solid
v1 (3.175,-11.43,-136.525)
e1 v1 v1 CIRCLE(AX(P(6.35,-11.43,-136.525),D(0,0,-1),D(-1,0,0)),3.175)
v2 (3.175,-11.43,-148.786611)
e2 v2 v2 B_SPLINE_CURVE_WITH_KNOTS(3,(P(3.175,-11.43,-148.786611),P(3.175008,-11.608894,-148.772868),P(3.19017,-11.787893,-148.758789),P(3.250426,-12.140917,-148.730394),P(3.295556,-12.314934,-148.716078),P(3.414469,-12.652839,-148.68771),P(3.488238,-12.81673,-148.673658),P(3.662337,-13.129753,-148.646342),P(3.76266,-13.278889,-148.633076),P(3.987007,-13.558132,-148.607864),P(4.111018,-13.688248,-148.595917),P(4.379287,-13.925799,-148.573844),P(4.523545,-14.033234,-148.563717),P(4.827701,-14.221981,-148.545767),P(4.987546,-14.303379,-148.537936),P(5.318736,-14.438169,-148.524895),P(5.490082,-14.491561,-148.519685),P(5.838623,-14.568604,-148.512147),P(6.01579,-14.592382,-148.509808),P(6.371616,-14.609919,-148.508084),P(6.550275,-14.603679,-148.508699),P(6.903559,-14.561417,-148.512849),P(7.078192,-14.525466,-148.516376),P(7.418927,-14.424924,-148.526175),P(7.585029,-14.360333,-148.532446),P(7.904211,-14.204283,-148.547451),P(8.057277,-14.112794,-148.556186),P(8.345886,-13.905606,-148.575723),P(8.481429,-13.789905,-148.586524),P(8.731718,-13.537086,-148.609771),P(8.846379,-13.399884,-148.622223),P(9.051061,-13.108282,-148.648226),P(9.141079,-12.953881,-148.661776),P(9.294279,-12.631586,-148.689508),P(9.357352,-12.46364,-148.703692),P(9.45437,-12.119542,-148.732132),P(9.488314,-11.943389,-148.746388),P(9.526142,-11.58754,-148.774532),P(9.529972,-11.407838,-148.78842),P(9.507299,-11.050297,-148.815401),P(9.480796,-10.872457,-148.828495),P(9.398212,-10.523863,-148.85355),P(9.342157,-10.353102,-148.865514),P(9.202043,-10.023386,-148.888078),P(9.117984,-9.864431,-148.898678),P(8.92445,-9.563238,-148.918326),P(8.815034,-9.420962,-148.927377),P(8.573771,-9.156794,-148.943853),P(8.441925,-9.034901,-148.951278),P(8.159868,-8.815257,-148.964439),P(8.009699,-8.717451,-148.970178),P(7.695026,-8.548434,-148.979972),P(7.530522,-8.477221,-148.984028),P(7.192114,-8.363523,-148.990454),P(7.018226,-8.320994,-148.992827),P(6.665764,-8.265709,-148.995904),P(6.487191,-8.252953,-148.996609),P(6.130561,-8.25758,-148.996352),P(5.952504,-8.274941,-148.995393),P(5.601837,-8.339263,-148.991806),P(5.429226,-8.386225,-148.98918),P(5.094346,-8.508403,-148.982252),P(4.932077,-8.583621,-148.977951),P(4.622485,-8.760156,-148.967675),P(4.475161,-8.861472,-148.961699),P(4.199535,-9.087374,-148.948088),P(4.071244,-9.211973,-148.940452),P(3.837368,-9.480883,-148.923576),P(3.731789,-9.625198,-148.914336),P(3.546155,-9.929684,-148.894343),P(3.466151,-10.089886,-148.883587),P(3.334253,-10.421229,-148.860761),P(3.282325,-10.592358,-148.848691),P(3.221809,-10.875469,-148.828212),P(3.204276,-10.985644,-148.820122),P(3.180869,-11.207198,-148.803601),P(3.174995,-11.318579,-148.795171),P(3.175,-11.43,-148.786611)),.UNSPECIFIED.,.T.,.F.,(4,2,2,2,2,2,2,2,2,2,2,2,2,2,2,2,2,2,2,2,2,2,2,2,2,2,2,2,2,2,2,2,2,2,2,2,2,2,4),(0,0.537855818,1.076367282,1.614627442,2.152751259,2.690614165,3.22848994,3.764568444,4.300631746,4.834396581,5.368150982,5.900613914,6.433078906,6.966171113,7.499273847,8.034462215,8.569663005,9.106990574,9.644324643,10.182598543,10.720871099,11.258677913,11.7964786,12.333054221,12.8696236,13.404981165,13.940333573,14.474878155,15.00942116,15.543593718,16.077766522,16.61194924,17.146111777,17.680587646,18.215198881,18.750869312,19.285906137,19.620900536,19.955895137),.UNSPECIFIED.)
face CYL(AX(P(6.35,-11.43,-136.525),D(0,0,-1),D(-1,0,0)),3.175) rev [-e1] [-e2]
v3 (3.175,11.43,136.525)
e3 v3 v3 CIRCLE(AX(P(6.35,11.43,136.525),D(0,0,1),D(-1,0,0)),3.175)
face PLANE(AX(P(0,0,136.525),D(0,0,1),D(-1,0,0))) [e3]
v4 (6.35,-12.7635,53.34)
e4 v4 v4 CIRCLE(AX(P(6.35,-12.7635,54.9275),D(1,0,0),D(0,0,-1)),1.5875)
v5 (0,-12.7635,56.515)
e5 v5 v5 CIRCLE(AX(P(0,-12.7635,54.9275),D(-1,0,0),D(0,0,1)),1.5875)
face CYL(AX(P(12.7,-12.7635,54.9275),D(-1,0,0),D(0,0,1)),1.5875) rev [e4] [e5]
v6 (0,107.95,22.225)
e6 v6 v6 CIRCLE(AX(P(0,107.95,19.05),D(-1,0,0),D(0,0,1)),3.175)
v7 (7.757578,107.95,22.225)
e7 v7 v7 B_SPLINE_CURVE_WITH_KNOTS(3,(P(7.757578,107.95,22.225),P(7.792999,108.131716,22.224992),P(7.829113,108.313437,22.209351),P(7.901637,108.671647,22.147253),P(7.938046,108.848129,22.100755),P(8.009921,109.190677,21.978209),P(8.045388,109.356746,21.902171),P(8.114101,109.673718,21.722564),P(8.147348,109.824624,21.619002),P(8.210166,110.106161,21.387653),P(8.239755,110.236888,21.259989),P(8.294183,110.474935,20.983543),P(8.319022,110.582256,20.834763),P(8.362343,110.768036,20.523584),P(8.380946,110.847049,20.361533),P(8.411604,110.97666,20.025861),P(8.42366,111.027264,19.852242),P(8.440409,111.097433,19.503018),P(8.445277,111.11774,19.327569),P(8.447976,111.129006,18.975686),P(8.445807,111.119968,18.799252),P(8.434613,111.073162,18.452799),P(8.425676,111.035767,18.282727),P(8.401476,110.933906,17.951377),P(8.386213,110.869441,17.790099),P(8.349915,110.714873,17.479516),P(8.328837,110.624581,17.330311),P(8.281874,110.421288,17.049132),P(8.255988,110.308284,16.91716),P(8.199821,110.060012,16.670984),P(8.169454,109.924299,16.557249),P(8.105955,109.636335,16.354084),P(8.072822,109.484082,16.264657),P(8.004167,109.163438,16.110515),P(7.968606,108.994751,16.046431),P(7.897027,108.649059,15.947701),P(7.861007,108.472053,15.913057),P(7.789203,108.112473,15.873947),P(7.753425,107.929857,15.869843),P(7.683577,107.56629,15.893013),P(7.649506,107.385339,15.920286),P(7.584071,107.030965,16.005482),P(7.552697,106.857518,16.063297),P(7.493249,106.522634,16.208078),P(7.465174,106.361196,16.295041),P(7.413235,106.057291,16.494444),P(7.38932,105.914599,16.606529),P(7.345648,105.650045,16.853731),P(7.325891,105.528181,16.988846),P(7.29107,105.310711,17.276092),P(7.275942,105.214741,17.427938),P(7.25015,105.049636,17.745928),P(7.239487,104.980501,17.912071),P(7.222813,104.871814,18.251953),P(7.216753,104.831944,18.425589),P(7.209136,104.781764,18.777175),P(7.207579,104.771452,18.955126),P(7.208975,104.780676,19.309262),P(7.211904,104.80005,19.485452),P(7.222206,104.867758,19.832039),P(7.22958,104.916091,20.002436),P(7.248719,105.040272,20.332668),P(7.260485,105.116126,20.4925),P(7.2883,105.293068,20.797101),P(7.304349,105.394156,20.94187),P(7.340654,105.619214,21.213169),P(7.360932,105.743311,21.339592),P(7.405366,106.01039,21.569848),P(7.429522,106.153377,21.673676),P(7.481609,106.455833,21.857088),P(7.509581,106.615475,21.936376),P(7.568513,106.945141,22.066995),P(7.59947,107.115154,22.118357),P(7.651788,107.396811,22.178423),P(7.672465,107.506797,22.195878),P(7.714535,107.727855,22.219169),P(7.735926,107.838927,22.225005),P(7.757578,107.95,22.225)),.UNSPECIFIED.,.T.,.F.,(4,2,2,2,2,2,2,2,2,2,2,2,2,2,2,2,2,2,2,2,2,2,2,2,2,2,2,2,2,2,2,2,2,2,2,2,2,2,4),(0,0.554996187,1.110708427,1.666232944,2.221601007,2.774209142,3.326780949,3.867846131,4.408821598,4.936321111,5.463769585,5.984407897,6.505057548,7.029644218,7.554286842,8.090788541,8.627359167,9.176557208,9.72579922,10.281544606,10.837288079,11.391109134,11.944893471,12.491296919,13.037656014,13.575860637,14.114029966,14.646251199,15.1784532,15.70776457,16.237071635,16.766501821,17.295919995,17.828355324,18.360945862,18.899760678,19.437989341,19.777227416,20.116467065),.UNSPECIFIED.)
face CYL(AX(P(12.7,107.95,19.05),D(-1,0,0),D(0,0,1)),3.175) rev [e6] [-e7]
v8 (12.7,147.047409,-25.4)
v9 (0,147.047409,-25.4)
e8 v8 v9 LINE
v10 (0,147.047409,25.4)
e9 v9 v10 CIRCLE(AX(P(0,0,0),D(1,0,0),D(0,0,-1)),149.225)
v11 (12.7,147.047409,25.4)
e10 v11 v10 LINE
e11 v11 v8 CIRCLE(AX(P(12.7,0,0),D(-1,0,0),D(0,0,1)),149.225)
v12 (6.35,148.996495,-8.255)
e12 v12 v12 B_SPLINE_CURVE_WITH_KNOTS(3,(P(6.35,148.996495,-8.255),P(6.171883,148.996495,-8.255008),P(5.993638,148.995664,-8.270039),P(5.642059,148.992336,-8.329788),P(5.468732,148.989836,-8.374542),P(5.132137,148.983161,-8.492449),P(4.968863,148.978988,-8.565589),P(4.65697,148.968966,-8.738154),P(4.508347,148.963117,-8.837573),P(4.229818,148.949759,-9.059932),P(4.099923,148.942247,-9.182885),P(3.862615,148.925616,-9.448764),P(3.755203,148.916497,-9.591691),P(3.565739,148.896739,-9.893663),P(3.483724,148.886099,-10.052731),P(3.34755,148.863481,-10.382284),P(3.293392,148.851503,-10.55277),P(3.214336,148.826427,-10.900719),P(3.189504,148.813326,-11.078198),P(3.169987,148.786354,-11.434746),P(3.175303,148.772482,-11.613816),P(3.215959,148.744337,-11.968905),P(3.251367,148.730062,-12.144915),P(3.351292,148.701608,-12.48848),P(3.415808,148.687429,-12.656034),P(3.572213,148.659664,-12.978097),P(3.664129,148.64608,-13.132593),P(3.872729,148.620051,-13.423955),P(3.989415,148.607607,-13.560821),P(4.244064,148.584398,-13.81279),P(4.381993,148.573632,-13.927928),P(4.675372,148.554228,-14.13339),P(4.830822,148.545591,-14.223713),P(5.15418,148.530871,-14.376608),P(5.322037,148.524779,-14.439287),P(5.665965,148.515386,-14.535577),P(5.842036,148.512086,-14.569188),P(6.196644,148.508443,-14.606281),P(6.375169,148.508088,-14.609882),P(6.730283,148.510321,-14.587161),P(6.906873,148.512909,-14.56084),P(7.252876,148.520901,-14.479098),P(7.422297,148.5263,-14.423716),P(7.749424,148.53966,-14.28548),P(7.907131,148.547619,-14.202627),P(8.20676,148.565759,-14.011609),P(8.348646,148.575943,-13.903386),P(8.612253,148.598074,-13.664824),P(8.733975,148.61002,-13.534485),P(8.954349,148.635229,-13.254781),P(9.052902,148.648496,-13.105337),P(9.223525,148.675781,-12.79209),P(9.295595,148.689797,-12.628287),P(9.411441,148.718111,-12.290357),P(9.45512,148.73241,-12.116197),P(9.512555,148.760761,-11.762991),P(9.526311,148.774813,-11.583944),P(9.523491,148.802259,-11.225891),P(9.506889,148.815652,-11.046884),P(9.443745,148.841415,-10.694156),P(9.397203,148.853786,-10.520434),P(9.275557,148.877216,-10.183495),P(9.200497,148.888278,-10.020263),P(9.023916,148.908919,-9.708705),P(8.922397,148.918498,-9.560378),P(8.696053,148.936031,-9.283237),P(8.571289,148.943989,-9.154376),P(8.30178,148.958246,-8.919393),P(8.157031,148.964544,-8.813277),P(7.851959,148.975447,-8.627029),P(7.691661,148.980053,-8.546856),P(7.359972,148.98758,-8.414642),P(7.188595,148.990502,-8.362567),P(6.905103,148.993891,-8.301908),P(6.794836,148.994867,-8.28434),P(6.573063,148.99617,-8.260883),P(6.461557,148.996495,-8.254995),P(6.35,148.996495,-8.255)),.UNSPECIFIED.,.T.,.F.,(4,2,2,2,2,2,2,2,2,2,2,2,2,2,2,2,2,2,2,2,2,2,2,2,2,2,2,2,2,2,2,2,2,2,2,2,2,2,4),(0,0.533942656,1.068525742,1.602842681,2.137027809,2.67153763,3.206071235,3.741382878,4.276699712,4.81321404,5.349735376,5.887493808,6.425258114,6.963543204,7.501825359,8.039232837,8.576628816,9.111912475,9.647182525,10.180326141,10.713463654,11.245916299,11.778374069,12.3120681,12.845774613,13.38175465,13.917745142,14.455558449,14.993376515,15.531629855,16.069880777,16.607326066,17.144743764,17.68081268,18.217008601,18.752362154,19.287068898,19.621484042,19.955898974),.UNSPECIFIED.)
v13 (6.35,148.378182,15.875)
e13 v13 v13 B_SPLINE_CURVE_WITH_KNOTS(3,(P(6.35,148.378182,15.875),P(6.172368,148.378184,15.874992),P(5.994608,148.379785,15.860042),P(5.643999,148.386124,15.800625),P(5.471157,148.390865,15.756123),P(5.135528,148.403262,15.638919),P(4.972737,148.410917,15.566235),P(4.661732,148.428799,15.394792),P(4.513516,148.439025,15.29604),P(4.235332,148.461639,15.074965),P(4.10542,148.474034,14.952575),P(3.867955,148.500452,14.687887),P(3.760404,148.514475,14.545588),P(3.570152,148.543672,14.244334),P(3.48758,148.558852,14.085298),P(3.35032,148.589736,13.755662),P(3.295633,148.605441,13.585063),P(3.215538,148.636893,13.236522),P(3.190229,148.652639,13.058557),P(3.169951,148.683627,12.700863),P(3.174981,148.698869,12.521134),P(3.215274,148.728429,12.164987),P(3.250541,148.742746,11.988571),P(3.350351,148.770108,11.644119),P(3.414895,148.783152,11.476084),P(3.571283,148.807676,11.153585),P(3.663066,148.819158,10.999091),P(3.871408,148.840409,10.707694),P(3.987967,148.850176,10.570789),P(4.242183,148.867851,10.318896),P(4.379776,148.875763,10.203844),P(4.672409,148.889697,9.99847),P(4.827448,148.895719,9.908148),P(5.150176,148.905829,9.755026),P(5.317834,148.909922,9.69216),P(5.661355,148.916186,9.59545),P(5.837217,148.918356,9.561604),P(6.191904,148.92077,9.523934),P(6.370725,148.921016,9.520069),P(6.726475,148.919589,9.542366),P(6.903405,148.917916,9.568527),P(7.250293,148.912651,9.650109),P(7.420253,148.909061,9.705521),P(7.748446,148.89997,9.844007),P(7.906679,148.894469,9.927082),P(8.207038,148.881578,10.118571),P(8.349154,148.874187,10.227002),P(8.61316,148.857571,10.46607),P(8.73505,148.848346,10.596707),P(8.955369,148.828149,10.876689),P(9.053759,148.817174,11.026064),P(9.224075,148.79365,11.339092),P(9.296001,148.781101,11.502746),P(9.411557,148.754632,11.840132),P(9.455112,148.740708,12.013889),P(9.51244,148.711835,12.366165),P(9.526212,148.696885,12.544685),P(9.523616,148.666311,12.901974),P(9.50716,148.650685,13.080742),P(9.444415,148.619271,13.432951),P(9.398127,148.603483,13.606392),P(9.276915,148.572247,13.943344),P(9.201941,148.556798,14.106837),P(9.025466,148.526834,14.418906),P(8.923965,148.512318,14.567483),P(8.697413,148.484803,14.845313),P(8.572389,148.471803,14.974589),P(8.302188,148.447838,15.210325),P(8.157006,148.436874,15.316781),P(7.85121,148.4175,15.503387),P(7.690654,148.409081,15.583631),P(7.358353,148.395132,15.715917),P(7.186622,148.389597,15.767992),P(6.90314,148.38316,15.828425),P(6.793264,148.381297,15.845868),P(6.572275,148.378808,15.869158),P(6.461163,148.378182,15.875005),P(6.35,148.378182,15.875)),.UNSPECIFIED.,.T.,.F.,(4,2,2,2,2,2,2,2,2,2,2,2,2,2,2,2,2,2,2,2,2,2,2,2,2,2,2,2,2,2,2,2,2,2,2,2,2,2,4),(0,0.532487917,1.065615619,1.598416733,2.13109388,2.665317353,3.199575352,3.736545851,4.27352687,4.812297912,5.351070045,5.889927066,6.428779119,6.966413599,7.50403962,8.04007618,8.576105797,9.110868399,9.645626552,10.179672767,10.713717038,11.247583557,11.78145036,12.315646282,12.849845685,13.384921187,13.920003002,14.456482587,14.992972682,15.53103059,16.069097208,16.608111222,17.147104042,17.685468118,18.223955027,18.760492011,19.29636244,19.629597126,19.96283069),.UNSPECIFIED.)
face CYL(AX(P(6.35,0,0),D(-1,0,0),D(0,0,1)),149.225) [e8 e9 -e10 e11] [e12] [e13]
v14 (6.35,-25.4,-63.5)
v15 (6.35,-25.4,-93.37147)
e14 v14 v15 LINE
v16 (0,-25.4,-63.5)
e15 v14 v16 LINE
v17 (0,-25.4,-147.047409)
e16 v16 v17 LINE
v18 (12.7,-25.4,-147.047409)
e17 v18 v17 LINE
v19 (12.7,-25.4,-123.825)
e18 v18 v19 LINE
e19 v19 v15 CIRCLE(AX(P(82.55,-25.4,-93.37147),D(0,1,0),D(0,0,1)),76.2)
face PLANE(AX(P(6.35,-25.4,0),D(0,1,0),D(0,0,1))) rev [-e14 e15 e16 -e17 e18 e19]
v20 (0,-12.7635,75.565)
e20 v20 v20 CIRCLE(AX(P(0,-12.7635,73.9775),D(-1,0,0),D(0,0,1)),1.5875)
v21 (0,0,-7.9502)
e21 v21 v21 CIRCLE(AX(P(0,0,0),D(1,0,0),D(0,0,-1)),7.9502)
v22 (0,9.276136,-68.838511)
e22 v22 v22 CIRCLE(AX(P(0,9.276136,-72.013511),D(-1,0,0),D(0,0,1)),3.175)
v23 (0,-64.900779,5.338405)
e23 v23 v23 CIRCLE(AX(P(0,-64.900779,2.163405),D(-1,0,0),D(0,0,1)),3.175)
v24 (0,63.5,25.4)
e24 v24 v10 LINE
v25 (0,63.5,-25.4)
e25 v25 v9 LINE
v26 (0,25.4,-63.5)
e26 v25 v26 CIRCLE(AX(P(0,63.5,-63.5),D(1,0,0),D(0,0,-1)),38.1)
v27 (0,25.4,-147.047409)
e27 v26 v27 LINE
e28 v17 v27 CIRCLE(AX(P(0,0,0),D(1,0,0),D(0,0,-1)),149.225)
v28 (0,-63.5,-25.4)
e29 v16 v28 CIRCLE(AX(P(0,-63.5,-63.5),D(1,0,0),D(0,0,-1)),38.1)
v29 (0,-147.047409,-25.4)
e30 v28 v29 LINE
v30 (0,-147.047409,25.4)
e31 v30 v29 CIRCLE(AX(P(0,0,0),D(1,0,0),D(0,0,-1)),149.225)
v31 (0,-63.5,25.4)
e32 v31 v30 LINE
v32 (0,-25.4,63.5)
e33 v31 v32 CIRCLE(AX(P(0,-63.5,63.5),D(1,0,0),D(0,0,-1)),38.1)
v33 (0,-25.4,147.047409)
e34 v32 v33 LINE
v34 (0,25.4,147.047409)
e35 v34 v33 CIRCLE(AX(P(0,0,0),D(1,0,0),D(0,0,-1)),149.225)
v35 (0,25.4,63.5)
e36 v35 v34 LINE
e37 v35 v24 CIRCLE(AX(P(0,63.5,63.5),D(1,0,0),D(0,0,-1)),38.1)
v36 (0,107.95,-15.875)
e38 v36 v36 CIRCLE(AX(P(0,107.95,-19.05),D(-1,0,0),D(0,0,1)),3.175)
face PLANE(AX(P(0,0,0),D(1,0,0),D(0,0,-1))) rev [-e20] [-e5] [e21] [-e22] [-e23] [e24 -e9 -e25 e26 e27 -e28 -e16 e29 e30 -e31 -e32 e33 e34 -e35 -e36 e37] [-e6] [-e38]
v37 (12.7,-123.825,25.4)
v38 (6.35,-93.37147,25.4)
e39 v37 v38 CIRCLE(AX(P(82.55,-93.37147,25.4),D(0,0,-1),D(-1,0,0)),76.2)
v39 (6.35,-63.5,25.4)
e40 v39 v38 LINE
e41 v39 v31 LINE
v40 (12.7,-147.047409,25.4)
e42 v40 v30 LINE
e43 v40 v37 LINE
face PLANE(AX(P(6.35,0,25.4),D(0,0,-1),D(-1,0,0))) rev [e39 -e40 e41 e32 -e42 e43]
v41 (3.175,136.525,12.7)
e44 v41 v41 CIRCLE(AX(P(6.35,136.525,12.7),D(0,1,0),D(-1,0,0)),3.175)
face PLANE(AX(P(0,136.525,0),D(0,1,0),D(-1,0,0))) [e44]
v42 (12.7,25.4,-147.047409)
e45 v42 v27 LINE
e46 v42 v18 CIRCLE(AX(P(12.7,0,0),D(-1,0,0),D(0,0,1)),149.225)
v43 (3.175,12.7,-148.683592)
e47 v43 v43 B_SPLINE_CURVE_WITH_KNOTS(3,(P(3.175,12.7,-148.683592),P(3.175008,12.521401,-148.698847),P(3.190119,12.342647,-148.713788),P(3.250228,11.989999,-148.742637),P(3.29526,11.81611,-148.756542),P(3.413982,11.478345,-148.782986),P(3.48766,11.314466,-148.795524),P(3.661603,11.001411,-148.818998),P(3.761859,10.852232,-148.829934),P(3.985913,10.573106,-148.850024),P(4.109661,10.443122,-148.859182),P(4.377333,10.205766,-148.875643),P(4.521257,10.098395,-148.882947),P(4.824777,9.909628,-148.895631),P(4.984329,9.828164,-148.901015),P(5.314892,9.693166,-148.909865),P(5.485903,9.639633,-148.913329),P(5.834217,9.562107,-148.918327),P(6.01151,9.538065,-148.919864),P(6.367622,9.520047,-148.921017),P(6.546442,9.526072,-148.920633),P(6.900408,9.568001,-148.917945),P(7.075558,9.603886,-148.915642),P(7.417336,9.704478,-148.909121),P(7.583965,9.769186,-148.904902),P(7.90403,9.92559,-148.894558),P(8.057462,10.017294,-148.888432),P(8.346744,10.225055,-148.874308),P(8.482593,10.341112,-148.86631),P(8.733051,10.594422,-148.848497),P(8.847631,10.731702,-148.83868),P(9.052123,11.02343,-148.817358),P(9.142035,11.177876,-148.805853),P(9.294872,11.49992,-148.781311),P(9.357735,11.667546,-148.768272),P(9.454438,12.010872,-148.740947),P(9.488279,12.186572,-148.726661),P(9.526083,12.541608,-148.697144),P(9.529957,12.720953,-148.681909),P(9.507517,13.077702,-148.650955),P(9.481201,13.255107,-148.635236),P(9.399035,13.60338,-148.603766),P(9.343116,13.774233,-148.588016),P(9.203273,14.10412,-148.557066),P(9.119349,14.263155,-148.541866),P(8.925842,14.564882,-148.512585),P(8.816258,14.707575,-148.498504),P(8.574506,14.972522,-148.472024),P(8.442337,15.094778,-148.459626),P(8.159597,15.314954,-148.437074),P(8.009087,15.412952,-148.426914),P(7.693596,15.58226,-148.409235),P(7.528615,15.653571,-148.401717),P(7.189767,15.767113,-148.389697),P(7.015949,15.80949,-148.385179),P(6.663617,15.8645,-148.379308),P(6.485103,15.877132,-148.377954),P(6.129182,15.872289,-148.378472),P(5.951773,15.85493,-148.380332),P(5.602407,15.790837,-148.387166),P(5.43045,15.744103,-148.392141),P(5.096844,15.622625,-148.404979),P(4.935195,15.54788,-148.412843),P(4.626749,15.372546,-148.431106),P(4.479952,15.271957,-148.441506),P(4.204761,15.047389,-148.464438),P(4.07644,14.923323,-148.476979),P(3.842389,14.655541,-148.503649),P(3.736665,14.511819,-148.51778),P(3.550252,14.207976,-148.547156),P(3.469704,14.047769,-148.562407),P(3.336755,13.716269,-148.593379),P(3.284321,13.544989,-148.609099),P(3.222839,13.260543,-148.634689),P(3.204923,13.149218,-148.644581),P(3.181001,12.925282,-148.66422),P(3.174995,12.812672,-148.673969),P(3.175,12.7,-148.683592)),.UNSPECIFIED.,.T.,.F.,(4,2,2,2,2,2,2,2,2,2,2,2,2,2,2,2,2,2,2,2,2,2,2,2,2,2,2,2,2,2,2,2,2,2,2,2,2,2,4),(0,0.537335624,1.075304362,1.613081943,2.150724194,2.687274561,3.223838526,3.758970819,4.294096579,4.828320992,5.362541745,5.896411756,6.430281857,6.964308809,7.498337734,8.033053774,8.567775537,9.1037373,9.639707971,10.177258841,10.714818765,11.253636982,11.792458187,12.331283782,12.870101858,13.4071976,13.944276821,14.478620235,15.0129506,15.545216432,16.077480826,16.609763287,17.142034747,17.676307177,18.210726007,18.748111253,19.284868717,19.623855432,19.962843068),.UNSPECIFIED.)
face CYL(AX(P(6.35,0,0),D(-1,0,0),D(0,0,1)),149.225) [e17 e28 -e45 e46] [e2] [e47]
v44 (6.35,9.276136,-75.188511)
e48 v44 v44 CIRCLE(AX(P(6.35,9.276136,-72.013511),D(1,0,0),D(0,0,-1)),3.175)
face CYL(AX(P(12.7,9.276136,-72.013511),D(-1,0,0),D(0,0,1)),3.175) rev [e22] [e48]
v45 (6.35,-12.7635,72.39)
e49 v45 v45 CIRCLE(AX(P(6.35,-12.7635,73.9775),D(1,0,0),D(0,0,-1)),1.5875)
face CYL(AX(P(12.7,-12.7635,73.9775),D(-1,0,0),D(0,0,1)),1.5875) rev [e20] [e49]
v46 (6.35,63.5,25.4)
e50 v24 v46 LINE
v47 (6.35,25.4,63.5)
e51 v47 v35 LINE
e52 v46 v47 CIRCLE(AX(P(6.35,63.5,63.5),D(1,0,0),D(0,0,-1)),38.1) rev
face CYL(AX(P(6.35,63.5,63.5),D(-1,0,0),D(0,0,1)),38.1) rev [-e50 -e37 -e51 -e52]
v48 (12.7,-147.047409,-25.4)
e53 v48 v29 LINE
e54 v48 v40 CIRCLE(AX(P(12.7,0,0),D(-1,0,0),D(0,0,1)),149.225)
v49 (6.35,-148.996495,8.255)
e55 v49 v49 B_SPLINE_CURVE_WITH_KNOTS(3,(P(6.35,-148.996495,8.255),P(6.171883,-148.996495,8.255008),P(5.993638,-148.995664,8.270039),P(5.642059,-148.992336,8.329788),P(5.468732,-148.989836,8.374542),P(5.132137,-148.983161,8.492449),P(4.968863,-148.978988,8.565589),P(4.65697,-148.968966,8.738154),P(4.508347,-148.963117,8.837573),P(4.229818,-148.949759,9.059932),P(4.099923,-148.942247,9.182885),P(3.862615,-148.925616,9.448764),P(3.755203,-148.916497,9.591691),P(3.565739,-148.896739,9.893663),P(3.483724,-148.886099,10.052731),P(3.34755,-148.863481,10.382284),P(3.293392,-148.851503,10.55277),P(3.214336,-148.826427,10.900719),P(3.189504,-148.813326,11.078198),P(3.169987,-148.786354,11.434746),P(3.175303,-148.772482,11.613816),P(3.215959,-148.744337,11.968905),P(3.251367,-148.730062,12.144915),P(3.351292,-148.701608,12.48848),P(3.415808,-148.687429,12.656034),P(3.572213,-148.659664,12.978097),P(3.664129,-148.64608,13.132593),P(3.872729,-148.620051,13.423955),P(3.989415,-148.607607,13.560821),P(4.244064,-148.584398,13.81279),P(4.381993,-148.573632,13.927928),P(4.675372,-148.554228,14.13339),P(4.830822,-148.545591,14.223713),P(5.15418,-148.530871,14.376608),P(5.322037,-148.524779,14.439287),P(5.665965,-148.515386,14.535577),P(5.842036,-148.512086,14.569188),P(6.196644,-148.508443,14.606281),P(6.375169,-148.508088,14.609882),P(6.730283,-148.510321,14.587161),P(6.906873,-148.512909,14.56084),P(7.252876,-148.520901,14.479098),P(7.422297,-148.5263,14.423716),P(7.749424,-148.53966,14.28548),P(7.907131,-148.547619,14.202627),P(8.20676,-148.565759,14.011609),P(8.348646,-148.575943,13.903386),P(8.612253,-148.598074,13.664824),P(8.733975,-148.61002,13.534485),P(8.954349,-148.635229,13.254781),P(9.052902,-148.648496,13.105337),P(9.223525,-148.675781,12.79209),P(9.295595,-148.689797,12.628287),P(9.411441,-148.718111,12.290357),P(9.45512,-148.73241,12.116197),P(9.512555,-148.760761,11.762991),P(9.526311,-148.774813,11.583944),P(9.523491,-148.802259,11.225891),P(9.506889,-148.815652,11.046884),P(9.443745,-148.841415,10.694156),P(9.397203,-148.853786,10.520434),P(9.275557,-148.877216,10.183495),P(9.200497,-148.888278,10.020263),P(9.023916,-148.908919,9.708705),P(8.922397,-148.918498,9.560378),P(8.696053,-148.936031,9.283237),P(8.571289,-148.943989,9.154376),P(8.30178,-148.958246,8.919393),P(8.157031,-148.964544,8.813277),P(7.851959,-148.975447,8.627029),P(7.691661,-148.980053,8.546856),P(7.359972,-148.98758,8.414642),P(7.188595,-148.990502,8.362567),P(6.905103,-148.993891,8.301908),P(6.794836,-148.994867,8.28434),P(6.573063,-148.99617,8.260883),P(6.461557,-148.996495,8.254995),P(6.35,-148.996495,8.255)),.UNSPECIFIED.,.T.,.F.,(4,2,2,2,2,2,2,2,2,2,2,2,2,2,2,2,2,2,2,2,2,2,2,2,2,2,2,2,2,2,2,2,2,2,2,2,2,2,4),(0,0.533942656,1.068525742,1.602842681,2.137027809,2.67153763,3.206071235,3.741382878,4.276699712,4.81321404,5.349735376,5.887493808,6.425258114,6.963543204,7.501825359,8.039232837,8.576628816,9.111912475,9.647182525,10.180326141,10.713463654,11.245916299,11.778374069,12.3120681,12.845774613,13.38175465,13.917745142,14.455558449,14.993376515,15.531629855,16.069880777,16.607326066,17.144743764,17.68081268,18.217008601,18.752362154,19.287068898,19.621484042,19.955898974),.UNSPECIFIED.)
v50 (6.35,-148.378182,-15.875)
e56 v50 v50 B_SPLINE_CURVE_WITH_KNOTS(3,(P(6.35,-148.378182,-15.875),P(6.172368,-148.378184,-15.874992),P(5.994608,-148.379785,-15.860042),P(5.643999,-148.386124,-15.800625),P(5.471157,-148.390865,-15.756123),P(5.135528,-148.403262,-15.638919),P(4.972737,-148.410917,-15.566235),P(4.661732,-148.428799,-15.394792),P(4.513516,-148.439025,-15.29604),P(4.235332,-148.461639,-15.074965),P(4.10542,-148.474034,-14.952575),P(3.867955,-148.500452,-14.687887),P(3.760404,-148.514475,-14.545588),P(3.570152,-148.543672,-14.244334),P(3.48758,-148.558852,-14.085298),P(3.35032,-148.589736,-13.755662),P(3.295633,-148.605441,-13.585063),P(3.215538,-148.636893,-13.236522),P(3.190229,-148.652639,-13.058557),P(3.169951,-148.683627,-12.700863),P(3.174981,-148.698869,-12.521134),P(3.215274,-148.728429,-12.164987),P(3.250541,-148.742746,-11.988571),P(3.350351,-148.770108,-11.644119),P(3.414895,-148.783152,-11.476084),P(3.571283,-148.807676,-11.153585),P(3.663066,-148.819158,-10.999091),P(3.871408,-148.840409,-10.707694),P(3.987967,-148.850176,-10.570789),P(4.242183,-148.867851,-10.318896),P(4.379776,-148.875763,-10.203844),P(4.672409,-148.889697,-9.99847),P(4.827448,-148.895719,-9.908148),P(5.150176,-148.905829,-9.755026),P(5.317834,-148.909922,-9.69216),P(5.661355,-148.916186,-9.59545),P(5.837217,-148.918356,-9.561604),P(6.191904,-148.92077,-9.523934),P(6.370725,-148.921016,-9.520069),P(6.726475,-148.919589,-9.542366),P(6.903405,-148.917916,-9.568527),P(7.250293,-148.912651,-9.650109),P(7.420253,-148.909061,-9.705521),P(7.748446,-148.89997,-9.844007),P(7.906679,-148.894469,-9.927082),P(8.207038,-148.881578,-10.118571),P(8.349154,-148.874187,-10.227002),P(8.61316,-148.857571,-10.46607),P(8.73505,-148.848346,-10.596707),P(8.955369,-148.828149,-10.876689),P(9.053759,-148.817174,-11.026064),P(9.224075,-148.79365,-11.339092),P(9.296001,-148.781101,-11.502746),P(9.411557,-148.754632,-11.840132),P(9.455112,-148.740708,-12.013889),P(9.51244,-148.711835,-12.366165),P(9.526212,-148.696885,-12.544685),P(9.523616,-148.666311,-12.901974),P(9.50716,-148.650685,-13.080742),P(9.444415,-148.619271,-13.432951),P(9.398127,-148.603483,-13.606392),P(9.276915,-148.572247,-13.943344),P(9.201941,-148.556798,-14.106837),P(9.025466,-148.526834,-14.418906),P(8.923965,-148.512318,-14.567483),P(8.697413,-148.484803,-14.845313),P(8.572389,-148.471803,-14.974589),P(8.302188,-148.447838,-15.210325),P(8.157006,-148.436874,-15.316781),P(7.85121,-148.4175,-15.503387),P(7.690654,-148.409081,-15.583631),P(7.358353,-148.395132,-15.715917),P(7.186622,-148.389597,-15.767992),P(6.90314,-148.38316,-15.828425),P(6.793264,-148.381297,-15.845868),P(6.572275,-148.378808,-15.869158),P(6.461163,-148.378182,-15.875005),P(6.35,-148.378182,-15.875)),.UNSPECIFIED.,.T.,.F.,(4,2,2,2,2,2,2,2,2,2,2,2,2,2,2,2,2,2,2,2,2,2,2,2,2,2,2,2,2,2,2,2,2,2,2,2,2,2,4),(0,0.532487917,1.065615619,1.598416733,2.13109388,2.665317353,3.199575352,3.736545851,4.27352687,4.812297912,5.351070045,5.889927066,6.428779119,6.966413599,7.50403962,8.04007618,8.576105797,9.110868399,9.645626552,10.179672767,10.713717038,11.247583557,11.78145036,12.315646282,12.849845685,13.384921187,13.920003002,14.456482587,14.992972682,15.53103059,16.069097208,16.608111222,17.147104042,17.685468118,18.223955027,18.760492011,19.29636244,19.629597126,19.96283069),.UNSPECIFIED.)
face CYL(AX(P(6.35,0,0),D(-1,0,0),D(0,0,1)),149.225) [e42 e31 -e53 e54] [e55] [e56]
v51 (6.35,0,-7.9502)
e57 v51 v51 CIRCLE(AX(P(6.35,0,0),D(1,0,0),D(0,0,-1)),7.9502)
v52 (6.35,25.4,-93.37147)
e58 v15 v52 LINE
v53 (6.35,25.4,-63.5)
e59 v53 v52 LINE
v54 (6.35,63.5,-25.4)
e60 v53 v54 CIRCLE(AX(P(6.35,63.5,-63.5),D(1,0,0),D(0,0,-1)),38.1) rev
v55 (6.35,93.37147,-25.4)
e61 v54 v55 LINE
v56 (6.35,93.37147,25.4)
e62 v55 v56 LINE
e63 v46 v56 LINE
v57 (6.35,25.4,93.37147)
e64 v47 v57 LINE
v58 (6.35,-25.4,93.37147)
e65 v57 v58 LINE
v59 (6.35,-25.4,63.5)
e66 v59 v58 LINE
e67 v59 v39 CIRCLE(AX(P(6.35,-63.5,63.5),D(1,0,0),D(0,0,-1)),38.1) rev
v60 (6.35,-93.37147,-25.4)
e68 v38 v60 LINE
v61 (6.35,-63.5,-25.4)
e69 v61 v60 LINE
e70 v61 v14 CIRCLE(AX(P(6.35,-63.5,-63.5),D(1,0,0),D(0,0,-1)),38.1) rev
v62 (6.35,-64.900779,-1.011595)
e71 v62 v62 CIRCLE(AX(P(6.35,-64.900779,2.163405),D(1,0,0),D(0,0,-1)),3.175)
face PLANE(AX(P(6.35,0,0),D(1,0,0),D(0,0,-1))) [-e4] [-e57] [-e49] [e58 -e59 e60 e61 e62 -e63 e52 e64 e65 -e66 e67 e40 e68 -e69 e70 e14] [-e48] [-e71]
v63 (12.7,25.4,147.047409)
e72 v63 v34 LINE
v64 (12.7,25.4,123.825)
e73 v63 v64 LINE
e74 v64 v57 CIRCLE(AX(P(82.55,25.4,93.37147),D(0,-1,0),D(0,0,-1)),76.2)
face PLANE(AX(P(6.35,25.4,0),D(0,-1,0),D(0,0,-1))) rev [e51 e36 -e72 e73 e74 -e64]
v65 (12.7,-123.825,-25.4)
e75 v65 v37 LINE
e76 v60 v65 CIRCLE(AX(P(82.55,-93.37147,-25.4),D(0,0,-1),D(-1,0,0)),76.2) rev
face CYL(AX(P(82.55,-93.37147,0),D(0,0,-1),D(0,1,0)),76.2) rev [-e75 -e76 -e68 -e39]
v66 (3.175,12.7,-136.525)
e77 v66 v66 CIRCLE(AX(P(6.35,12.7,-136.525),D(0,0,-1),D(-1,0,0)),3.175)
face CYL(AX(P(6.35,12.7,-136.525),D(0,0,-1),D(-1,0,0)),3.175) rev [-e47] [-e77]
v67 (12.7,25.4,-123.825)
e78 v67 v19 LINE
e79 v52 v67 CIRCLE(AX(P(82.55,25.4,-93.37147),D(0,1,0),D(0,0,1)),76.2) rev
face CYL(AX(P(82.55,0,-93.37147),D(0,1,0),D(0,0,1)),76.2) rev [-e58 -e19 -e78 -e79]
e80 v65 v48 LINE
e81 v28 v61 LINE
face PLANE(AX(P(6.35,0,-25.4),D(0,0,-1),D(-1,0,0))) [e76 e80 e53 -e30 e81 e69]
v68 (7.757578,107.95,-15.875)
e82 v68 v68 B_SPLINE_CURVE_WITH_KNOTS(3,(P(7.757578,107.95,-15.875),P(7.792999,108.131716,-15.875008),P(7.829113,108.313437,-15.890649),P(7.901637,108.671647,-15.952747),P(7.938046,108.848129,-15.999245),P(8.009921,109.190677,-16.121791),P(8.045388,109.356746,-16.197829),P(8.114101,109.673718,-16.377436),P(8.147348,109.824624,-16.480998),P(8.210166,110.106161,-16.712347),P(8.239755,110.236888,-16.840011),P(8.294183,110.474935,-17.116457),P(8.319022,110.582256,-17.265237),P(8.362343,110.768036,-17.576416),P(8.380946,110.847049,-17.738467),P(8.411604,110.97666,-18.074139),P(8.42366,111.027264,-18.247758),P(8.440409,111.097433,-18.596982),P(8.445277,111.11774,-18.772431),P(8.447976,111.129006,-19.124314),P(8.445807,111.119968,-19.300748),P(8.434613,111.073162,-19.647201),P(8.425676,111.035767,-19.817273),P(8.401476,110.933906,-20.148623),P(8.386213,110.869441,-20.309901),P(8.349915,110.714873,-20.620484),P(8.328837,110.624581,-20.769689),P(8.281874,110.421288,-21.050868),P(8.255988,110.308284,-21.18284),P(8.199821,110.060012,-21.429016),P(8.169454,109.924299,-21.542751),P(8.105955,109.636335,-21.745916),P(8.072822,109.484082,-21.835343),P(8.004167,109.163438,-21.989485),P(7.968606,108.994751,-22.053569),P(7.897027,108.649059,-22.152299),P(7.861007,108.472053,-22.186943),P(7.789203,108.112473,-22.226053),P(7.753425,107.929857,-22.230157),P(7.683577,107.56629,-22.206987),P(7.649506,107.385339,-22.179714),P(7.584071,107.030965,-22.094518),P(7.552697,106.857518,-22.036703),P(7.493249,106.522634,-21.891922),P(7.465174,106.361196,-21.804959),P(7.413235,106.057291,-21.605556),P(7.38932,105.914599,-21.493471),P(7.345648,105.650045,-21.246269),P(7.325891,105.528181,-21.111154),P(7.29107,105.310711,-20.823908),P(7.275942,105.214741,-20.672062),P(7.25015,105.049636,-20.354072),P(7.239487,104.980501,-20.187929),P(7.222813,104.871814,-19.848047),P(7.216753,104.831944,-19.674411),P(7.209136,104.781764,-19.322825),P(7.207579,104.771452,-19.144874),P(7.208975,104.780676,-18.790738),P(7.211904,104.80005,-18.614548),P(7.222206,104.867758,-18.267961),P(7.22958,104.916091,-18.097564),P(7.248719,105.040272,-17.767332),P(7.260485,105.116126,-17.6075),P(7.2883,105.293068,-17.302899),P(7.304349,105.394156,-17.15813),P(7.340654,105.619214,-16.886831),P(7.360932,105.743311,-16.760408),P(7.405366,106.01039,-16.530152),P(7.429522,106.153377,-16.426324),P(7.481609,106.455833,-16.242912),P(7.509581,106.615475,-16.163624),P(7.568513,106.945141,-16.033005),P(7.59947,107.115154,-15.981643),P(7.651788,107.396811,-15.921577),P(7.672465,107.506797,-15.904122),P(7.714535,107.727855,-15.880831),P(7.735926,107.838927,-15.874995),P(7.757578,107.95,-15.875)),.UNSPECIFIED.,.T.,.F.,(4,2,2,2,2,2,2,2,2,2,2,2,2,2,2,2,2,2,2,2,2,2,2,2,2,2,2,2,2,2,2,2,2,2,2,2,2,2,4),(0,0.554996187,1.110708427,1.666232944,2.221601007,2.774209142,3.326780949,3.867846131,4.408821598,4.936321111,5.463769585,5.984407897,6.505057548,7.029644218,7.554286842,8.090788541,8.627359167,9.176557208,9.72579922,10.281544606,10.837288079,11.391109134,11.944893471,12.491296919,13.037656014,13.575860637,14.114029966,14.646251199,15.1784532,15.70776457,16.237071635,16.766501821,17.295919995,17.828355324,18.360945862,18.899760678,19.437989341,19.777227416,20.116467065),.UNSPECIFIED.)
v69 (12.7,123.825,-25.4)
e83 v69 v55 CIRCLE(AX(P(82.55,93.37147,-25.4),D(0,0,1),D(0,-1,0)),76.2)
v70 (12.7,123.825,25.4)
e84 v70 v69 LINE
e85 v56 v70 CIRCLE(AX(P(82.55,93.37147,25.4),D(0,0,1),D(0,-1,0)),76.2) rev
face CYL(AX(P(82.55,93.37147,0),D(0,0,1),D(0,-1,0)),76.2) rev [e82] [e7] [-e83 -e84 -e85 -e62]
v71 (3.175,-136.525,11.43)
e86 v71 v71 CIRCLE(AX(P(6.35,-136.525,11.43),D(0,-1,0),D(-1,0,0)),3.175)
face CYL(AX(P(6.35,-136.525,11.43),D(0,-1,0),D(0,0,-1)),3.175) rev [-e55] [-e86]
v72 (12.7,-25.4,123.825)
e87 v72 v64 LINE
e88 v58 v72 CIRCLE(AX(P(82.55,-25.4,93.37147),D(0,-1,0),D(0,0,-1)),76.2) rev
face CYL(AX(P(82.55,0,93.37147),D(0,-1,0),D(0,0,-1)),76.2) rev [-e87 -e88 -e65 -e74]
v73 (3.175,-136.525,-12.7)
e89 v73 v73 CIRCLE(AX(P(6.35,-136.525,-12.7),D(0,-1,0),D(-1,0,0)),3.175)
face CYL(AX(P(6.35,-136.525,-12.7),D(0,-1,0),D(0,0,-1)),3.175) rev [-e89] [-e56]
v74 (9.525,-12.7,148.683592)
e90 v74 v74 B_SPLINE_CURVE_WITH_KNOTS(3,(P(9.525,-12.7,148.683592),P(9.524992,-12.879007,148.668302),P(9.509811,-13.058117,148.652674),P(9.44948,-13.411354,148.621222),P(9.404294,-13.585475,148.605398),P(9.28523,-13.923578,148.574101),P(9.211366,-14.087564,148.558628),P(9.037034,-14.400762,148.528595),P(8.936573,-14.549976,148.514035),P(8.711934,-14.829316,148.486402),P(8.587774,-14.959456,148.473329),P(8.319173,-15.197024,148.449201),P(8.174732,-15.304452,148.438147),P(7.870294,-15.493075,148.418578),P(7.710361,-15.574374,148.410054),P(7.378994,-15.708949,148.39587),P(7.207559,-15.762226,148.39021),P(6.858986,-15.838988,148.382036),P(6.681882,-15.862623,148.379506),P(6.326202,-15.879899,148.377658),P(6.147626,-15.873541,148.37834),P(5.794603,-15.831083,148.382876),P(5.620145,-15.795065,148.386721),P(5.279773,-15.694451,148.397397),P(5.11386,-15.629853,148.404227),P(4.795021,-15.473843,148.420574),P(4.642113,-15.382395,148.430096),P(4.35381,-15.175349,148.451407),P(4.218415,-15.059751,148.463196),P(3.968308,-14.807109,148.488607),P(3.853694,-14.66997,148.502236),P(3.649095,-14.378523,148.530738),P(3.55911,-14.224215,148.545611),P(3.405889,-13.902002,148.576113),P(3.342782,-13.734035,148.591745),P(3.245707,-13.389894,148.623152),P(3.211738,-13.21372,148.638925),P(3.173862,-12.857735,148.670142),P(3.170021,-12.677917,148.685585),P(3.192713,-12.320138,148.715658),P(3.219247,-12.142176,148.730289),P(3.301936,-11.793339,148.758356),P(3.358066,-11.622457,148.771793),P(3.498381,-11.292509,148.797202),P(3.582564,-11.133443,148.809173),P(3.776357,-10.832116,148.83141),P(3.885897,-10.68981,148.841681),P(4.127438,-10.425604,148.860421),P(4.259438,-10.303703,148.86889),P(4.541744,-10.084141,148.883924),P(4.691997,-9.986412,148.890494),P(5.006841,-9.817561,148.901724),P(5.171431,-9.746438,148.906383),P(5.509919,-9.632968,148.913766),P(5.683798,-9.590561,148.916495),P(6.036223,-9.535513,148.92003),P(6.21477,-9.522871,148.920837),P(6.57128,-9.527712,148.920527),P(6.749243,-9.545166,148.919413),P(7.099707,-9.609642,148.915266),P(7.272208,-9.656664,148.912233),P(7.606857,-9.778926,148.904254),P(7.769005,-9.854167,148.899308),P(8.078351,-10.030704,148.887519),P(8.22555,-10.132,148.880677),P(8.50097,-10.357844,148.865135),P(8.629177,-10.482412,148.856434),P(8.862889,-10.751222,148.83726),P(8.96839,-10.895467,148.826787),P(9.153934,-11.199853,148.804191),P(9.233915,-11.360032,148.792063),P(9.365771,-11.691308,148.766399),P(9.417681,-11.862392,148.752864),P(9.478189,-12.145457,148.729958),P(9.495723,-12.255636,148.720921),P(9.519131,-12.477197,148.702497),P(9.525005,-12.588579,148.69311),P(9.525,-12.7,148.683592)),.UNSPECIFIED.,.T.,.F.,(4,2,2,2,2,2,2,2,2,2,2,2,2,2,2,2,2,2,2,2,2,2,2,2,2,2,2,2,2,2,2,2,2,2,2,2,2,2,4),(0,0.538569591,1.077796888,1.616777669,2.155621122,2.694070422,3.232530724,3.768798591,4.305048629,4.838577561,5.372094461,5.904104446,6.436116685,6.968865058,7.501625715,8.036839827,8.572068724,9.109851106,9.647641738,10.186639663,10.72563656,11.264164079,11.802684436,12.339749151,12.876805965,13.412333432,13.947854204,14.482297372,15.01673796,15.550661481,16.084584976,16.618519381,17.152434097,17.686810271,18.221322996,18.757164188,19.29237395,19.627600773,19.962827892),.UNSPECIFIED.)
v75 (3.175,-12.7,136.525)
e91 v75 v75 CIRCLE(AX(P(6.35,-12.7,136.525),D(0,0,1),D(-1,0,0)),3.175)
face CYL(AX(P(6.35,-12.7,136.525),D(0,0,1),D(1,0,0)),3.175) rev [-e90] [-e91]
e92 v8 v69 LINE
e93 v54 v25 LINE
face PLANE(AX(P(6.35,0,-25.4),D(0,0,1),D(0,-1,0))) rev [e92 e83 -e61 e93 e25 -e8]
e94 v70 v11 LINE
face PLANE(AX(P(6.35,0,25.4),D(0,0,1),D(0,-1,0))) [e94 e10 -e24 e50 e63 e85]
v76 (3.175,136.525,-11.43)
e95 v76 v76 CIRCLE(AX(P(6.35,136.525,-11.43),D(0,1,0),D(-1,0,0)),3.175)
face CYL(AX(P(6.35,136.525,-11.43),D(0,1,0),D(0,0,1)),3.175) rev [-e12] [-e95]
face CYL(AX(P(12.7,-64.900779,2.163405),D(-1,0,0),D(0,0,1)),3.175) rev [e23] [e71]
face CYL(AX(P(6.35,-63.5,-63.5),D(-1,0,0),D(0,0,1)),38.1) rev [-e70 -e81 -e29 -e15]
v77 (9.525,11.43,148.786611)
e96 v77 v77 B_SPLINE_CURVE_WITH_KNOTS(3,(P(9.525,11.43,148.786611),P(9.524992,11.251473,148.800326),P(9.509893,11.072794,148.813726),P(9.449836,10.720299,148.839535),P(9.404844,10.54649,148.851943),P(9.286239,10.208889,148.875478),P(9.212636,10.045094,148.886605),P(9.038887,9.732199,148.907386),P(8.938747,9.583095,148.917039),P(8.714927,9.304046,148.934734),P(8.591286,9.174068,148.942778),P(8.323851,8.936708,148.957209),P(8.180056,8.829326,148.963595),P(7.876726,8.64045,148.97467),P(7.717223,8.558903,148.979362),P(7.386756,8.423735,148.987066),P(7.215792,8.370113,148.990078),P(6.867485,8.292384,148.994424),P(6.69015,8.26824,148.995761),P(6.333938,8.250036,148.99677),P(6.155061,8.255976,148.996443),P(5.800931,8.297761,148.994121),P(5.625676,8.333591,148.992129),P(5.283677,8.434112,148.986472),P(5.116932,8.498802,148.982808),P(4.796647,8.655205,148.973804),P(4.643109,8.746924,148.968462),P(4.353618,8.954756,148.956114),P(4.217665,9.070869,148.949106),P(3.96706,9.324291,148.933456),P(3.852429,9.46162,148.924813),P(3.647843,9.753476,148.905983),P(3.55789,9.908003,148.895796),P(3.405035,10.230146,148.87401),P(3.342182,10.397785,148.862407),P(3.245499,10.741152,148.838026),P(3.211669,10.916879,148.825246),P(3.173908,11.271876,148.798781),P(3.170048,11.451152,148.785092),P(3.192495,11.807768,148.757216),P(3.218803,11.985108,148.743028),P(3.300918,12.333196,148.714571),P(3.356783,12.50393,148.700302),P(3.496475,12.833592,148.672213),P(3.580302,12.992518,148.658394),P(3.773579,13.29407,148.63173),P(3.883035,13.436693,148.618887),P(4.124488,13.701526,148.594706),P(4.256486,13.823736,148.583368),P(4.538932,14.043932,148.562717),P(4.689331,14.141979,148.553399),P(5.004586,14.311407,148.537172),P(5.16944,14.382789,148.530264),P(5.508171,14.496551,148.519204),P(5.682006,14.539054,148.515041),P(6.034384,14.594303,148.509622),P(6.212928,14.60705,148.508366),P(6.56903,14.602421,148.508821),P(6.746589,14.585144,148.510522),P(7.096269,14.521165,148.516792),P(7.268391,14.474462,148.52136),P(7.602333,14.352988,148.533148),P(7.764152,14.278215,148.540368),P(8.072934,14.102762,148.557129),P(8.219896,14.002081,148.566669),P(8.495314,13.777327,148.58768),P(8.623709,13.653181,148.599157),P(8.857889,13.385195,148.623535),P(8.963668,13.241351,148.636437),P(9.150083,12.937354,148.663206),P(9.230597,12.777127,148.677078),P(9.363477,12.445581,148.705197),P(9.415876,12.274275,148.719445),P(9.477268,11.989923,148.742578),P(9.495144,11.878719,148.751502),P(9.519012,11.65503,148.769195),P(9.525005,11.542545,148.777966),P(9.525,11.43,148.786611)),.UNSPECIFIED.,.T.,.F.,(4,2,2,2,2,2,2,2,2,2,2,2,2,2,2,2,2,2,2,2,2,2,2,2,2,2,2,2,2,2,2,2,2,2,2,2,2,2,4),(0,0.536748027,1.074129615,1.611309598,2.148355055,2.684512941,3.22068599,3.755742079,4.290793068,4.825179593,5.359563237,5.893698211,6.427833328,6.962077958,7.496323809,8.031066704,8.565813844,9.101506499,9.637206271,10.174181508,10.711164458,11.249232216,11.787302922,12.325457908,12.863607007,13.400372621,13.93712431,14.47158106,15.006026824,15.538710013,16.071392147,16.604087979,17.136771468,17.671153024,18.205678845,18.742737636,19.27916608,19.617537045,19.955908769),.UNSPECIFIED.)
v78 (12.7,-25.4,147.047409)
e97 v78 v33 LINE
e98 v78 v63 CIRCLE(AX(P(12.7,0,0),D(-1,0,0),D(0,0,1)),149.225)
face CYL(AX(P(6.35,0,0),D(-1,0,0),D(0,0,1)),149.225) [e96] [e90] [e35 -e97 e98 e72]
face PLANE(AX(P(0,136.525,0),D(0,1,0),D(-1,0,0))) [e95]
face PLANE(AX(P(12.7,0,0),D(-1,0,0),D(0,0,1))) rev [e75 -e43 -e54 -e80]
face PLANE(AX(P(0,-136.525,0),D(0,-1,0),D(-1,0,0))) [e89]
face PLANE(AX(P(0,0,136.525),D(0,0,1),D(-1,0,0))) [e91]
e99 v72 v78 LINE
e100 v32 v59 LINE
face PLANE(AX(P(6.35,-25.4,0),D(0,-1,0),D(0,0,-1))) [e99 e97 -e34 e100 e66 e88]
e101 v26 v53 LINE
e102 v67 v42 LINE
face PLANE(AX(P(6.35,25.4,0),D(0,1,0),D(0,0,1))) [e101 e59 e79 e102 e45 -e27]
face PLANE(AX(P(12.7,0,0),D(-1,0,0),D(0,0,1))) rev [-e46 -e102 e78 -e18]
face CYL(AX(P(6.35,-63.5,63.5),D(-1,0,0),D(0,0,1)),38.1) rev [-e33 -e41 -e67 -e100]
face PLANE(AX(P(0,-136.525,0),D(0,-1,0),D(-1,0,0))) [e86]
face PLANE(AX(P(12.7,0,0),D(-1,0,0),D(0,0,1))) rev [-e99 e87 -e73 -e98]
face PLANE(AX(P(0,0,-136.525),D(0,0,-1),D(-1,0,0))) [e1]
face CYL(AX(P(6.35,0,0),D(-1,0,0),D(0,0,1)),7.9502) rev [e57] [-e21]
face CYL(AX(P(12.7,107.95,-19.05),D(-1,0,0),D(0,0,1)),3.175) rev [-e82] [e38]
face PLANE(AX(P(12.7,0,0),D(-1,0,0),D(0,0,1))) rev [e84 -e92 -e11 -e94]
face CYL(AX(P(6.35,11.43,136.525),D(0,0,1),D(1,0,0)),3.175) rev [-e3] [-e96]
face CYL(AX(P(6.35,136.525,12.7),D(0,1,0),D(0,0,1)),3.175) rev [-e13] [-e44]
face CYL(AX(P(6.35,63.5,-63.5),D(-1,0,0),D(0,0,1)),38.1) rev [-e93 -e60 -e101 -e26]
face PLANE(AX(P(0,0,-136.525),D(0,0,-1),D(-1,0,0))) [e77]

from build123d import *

# Parameters (mm, degrees)
BOSS_EXTRUDE1_DEPTH = 6.35
SKETCH2_W           = 23.222409447
SKETCH2_H           = 25.4
BOSS_EXTRUDE2_DEPTH = 12.7
FILLET1_R           = 38.1
FILLET2_R           = 76.2
SKETCH3_R           = 3.175
CUT_EXTRUDE1_DEPTH  = 12.7
CIRPATTERN1_COUNT   = 4
SKETCH4_R           = 1.5875
SKETCH4_R_2         = 3.175
CUT_EXTRUDE2_DEPTH  = 212.417812192
SKETCH5_R           = 3.175
CUT_EXTRUDE3_DEPTH  = 212.417812192


with BuildPart() as part:
    # Sketch1 → Boss-Extrude1 (new body)
    with BuildSketch(Plane(origin=(0, 0, 0), x_dir=(0, 0, -1), z_dir=(1, 0, 0))):
        with BuildLine():
            Line((-25.4, 25.4), (0, 25.4))
            Line((0, 25.4), (25.4, 25.4))
            Line((25.4, 25.4), (25.4, 147.047409447))
            ThreePointArc((25.4, 147.047409447), (0, 149.225), (-25.4, 147.047409447))
            Line((-25.4, 147.047409447), (-25.4, 25.4))
        make_face()
        with BuildLine():
            Line((25.4, 25.4), (25.4, 0))
            Line((25.4, 0), (25.4, -25.4))
            Line((25.4, -25.4), (147.047409447, -25.4))
            ThreePointArc((147.047409447, -25.4), (148.679605696, -12.746586804), (149.225, 0))
            ThreePointArc((149.225, 0), (148.679605696, 12.746586804), (147.047409447, 25.4))
            Line((147.047409447, 25.4), (25.4, 25.4))
        make_face()
        with BuildLine():
            Line((-25.4, -25.4), (-25.4, 0))
            Line((-25.4, 0), (-25.4, 25.4))
            Line((-25.4, 25.4), (-147.047409447, 25.4))
            ThreePointArc((-147.047409447, 25.4), (-149.225, 0), (-147.047409447, -25.4))
            Line((-147.047409447, -25.4), (-25.4, -25.4))
        make_face()
        with BuildLine():
            Line((0, -149.225), (0, -25.4))
            Line((0, -25.4), (-25.4, -25.4))
            Line((-25.4, -25.4), (-25.4, -147.047409447))
            ThreePointArc((-25.4, -147.047409447), (-12.746586804, -148.679605696), (0, -149.225))
        make_face()
        with BuildLine():
            Line((25.4, -25.4), (0, -25.4))
            Line((0, -25.4), (0, -149.225))
            ThreePointArc((0, -149.225), (12.746586804, -148.679605696), (25.4, -147.047409447))
            Line((25.4, -147.047409447), (25.4, -25.4))
        make_face()
        with BuildLine():
            ThreePointArc((7.9502, 0), (5.621640332, -5.621640332), (0, -7.9502))
            Line((0, -7.9502), (0, -25.4))
            Line((0, -25.4), (25.4, -25.4))
            Line((25.4, -25.4), (25.4, 0))
            Line((25.4, 0), (7.9502, 0))
        make_face()
        with BuildLine():
            Line((0, -25.4), (0, -7.9502))
            ThreePointArc((0, -7.9502), (-5.621640332, -5.621640332), (-7.9502, 0))
            Line((-7.9502, 0), (-25.4, 0))
            Line((-25.4, 0), (-25.4, -25.4))
            Line((-25.4, -25.4), (0, -25.4))
        make_face()
        with BuildLine():
            Line((-25.4, 0), (-7.9502, 0))
            ThreePointArc((-7.9502, 0), (-5.621640332, 5.621640332), (0, 7.9502))
            Line((0, 7.9502), (0, 25.4))
            Line((0, 25.4), (-25.4, 25.4))
            Line((-25.4, 25.4), (-25.4, 0))
        make_face()
        with BuildLine():
            ThreePointArc((0, 7.9502), (5.621640332, 5.621640332), (7.9502, 0))
            Line((7.9502, 0), (25.4, 0))
            Line((25.4, 0), (25.4, 25.4))
            Line((25.4, 25.4), (0, 25.4))
            Line((0, 25.4), (0, 7.9502))
        make_face()
    extrude(amount=BOSS_EXTRUDE1_DEPTH)

    # Sketch2 → Boss-Extrude2 (add)
    with BuildSketch(Plane.ZY):
        with BuildLine():
            Line((-25.4, 147.047409447), (-25.4, 123.825))
            Line((-25.4, 123.825), (0, 123.825))
            Line((0, 123.825), (25.4, 123.825))
            Line((25.4, 123.825), (25.4, 147.047409447))
            ThreePointArc((25.4, 147.047409447), (0, 149.225), (-25.4, 147.047409447))
        make_face()
        with BuildLine():
            Line((147.047409447, 25.4), (123.825, 25.4))
            Line((123.825, 25.4), (123.825, 0))
            Line((123.825, 0), (123.825, -25.4))
            Line((123.825, -25.4), (147.047409447, -25.4))
            ThreePointArc((147.047409447, -25.4), (149.225, 0), (147.047409447, 25.4))
        make_face()
        with BuildLine():
            Line((0, -123.825), (-25.4, -123.825))
            Line((-25.4, -123.825), (-25.4, -147.047409447))
            ThreePointArc((-25.4, -147.047409447), (0, -149.225), (25.4, -147.047409447))
            Line((25.4, -147.047409447), (25.4, -123.825))
            Line((25.4, -123.825), (0, -123.825))
        make_face()
        with Locations((-135.436204723, -12.7)):
            Rectangle(SKETCH2_W, SKETCH2_H)
        with BuildLine():
            Line((-147.047409447, 0), (-147.047409447, 25.4))
            ThreePointArc((-147.047409447, 25.4), (-148.679605696, 12.746586804), (-149.225, 0))
            Line((-149.225, 0), (-147.047409447, 0))
        make_face()
        with BuildLine():
            Line((-147.047409447, -25.4), (-147.047409447, 0))
            Line((-147.047409447, 0), (-149.225, 0))
            ThreePointArc((-149.225, 0), (-148.679605696, -12.746586804), (-147.047409447, -25.4))
        make_face()
        with Locations((-135.436204723, 12.7)):
            Rectangle(SKETCH2_W, SKETCH2_H)
        with BuildLine():
            Line((-147.047409447, 0), (-147.047409447, 25.4))
            ThreePointArc((-147.047409447, 25.4), (-148.679605696, 12.746586804), (-149.225, 0))
            Line((-149.225, 0), (-147.047409447, 0))
        make_face()
        with BuildLine():
            Line((-147.047409447, -25.4), (-147.047409447, 0))
            Line((-147.047409447, 0), (-149.225, 0))
            ThreePointArc((-149.225, 0), (-148.679605696, -12.746586804), (-147.047409447, -25.4))
        make_face()
    extrude(amount=-BOSS_EXTRUDE2_DEPTH)

    # Fillet1
    fillet1_edges = [part.edges().sort_by_distance(p)[0] for p in [
        (3.175, -25.4, 25.4),
        (3.175, 25.4, 25.4),
        (3.175, 25.4, -25.4),
        (3.175, -25.4, -25.4),
    ]]
    fillet(fillet1_edges, radius=FILLET1_R)

    # Fillet2
    # the kernel refuses this fillet: 76.2 mm, written as the material it adds along each edge
    with BuildSketch(Plane(origin=(6.35, -25.4, 123.825), x_dir=(0, 0, -1), z_dir=(0, 1, 0)), Plane(origin=(6.35, -123.825, -25.4), x_dir=(0, 1, 0), z_dir=(0, 0, 1)), Plane(origin=(6.35, 25.4, -123.825), x_dir=(0, 0, 1), z_dir=(0, -1, 0)), Plane(origin=(6.35, 123.825, 25.4), x_dir=(0, -1, 0), z_dir=(0, 0, -1))) as fillet2_piece_1:
        with BuildLine():
            CenterArc((30.453530173, -76.2), FILLET2_R, 90, 23.556464309)
            Line((0, -6.35), (-0.609070603, -4.953))
            ThreePointArc((-0.609070603, -4.953), (-1.524, -3.175), (-1.524, 0))
            Line((-1.524, 0), (0, 1.524))
            Line((0, 1.524), (30.453530173, 1.524))
            Line((30.453530173, 1.524), (30.453530173, 0))
        make_face()
    extrude(amount=50.8)

    # Sketch3 → Cut-Extrude1 (cut)
    with BuildSketch(Plane(origin=(0, 0, -149.225), x_dir=(-1, 0, 0), z_dir=(0, 0, -1))):
        with Locations((-6.35, 12.7)):
            Circle(SKETCH3_R)
        with Locations((-6.35, -11.43)):
            Circle(SKETCH3_R)
    cut_extrude1 = extrude(amount=-CUT_EXTRUDE1_DEPTH, mode=Mode.SUBTRACT)

    # CirPattern1: Cut-Extrude1 ×4 about axis
    cirpattern1_axis = Axis((0, 0, 0), (1, 0, 0))
    for i in range(1, CIRPATTERN1_COUNT):
        add(cut_extrude1.rotate(cirpattern1_axis, i * 360 / CIRPATTERN1_COUNT), mode=Mode.SUBTRACT)

    # Sketch4 → Cut-Extrude2 (cut, through all)
    with BuildSketch(Plane.ZY):
        with Locations((73.9775, -12.7635)):
            Circle(SKETCH4_R)
        with Locations((54.9275, -12.7635)):
            Circle(SKETCH4_R)
        with Locations((19.05, 107.95)):
            Circle(SKETCH4_R_2)
        with Locations((-19.05, 107.95)):
            Circle(SKETCH4_R_2)
    extrude(amount=-CUT_EXTRUDE2_DEPTH, mode=Mode.SUBTRACT)

    # Sketch5 → Cut-Extrude3 (cut, through all)
    with BuildSketch(Plane.ZY):
        with Locations((2.163404924, -64.900779229)):
            Circle(SKETCH5_R)
        with Locations((-72.013510637, 9.276136331)):
            Circle(SKETCH5_R)
    extrude(amount=-CUT_EXTRUDE3_DEPTH, mode=Mode.SUBTRACT)


solid = part.part
